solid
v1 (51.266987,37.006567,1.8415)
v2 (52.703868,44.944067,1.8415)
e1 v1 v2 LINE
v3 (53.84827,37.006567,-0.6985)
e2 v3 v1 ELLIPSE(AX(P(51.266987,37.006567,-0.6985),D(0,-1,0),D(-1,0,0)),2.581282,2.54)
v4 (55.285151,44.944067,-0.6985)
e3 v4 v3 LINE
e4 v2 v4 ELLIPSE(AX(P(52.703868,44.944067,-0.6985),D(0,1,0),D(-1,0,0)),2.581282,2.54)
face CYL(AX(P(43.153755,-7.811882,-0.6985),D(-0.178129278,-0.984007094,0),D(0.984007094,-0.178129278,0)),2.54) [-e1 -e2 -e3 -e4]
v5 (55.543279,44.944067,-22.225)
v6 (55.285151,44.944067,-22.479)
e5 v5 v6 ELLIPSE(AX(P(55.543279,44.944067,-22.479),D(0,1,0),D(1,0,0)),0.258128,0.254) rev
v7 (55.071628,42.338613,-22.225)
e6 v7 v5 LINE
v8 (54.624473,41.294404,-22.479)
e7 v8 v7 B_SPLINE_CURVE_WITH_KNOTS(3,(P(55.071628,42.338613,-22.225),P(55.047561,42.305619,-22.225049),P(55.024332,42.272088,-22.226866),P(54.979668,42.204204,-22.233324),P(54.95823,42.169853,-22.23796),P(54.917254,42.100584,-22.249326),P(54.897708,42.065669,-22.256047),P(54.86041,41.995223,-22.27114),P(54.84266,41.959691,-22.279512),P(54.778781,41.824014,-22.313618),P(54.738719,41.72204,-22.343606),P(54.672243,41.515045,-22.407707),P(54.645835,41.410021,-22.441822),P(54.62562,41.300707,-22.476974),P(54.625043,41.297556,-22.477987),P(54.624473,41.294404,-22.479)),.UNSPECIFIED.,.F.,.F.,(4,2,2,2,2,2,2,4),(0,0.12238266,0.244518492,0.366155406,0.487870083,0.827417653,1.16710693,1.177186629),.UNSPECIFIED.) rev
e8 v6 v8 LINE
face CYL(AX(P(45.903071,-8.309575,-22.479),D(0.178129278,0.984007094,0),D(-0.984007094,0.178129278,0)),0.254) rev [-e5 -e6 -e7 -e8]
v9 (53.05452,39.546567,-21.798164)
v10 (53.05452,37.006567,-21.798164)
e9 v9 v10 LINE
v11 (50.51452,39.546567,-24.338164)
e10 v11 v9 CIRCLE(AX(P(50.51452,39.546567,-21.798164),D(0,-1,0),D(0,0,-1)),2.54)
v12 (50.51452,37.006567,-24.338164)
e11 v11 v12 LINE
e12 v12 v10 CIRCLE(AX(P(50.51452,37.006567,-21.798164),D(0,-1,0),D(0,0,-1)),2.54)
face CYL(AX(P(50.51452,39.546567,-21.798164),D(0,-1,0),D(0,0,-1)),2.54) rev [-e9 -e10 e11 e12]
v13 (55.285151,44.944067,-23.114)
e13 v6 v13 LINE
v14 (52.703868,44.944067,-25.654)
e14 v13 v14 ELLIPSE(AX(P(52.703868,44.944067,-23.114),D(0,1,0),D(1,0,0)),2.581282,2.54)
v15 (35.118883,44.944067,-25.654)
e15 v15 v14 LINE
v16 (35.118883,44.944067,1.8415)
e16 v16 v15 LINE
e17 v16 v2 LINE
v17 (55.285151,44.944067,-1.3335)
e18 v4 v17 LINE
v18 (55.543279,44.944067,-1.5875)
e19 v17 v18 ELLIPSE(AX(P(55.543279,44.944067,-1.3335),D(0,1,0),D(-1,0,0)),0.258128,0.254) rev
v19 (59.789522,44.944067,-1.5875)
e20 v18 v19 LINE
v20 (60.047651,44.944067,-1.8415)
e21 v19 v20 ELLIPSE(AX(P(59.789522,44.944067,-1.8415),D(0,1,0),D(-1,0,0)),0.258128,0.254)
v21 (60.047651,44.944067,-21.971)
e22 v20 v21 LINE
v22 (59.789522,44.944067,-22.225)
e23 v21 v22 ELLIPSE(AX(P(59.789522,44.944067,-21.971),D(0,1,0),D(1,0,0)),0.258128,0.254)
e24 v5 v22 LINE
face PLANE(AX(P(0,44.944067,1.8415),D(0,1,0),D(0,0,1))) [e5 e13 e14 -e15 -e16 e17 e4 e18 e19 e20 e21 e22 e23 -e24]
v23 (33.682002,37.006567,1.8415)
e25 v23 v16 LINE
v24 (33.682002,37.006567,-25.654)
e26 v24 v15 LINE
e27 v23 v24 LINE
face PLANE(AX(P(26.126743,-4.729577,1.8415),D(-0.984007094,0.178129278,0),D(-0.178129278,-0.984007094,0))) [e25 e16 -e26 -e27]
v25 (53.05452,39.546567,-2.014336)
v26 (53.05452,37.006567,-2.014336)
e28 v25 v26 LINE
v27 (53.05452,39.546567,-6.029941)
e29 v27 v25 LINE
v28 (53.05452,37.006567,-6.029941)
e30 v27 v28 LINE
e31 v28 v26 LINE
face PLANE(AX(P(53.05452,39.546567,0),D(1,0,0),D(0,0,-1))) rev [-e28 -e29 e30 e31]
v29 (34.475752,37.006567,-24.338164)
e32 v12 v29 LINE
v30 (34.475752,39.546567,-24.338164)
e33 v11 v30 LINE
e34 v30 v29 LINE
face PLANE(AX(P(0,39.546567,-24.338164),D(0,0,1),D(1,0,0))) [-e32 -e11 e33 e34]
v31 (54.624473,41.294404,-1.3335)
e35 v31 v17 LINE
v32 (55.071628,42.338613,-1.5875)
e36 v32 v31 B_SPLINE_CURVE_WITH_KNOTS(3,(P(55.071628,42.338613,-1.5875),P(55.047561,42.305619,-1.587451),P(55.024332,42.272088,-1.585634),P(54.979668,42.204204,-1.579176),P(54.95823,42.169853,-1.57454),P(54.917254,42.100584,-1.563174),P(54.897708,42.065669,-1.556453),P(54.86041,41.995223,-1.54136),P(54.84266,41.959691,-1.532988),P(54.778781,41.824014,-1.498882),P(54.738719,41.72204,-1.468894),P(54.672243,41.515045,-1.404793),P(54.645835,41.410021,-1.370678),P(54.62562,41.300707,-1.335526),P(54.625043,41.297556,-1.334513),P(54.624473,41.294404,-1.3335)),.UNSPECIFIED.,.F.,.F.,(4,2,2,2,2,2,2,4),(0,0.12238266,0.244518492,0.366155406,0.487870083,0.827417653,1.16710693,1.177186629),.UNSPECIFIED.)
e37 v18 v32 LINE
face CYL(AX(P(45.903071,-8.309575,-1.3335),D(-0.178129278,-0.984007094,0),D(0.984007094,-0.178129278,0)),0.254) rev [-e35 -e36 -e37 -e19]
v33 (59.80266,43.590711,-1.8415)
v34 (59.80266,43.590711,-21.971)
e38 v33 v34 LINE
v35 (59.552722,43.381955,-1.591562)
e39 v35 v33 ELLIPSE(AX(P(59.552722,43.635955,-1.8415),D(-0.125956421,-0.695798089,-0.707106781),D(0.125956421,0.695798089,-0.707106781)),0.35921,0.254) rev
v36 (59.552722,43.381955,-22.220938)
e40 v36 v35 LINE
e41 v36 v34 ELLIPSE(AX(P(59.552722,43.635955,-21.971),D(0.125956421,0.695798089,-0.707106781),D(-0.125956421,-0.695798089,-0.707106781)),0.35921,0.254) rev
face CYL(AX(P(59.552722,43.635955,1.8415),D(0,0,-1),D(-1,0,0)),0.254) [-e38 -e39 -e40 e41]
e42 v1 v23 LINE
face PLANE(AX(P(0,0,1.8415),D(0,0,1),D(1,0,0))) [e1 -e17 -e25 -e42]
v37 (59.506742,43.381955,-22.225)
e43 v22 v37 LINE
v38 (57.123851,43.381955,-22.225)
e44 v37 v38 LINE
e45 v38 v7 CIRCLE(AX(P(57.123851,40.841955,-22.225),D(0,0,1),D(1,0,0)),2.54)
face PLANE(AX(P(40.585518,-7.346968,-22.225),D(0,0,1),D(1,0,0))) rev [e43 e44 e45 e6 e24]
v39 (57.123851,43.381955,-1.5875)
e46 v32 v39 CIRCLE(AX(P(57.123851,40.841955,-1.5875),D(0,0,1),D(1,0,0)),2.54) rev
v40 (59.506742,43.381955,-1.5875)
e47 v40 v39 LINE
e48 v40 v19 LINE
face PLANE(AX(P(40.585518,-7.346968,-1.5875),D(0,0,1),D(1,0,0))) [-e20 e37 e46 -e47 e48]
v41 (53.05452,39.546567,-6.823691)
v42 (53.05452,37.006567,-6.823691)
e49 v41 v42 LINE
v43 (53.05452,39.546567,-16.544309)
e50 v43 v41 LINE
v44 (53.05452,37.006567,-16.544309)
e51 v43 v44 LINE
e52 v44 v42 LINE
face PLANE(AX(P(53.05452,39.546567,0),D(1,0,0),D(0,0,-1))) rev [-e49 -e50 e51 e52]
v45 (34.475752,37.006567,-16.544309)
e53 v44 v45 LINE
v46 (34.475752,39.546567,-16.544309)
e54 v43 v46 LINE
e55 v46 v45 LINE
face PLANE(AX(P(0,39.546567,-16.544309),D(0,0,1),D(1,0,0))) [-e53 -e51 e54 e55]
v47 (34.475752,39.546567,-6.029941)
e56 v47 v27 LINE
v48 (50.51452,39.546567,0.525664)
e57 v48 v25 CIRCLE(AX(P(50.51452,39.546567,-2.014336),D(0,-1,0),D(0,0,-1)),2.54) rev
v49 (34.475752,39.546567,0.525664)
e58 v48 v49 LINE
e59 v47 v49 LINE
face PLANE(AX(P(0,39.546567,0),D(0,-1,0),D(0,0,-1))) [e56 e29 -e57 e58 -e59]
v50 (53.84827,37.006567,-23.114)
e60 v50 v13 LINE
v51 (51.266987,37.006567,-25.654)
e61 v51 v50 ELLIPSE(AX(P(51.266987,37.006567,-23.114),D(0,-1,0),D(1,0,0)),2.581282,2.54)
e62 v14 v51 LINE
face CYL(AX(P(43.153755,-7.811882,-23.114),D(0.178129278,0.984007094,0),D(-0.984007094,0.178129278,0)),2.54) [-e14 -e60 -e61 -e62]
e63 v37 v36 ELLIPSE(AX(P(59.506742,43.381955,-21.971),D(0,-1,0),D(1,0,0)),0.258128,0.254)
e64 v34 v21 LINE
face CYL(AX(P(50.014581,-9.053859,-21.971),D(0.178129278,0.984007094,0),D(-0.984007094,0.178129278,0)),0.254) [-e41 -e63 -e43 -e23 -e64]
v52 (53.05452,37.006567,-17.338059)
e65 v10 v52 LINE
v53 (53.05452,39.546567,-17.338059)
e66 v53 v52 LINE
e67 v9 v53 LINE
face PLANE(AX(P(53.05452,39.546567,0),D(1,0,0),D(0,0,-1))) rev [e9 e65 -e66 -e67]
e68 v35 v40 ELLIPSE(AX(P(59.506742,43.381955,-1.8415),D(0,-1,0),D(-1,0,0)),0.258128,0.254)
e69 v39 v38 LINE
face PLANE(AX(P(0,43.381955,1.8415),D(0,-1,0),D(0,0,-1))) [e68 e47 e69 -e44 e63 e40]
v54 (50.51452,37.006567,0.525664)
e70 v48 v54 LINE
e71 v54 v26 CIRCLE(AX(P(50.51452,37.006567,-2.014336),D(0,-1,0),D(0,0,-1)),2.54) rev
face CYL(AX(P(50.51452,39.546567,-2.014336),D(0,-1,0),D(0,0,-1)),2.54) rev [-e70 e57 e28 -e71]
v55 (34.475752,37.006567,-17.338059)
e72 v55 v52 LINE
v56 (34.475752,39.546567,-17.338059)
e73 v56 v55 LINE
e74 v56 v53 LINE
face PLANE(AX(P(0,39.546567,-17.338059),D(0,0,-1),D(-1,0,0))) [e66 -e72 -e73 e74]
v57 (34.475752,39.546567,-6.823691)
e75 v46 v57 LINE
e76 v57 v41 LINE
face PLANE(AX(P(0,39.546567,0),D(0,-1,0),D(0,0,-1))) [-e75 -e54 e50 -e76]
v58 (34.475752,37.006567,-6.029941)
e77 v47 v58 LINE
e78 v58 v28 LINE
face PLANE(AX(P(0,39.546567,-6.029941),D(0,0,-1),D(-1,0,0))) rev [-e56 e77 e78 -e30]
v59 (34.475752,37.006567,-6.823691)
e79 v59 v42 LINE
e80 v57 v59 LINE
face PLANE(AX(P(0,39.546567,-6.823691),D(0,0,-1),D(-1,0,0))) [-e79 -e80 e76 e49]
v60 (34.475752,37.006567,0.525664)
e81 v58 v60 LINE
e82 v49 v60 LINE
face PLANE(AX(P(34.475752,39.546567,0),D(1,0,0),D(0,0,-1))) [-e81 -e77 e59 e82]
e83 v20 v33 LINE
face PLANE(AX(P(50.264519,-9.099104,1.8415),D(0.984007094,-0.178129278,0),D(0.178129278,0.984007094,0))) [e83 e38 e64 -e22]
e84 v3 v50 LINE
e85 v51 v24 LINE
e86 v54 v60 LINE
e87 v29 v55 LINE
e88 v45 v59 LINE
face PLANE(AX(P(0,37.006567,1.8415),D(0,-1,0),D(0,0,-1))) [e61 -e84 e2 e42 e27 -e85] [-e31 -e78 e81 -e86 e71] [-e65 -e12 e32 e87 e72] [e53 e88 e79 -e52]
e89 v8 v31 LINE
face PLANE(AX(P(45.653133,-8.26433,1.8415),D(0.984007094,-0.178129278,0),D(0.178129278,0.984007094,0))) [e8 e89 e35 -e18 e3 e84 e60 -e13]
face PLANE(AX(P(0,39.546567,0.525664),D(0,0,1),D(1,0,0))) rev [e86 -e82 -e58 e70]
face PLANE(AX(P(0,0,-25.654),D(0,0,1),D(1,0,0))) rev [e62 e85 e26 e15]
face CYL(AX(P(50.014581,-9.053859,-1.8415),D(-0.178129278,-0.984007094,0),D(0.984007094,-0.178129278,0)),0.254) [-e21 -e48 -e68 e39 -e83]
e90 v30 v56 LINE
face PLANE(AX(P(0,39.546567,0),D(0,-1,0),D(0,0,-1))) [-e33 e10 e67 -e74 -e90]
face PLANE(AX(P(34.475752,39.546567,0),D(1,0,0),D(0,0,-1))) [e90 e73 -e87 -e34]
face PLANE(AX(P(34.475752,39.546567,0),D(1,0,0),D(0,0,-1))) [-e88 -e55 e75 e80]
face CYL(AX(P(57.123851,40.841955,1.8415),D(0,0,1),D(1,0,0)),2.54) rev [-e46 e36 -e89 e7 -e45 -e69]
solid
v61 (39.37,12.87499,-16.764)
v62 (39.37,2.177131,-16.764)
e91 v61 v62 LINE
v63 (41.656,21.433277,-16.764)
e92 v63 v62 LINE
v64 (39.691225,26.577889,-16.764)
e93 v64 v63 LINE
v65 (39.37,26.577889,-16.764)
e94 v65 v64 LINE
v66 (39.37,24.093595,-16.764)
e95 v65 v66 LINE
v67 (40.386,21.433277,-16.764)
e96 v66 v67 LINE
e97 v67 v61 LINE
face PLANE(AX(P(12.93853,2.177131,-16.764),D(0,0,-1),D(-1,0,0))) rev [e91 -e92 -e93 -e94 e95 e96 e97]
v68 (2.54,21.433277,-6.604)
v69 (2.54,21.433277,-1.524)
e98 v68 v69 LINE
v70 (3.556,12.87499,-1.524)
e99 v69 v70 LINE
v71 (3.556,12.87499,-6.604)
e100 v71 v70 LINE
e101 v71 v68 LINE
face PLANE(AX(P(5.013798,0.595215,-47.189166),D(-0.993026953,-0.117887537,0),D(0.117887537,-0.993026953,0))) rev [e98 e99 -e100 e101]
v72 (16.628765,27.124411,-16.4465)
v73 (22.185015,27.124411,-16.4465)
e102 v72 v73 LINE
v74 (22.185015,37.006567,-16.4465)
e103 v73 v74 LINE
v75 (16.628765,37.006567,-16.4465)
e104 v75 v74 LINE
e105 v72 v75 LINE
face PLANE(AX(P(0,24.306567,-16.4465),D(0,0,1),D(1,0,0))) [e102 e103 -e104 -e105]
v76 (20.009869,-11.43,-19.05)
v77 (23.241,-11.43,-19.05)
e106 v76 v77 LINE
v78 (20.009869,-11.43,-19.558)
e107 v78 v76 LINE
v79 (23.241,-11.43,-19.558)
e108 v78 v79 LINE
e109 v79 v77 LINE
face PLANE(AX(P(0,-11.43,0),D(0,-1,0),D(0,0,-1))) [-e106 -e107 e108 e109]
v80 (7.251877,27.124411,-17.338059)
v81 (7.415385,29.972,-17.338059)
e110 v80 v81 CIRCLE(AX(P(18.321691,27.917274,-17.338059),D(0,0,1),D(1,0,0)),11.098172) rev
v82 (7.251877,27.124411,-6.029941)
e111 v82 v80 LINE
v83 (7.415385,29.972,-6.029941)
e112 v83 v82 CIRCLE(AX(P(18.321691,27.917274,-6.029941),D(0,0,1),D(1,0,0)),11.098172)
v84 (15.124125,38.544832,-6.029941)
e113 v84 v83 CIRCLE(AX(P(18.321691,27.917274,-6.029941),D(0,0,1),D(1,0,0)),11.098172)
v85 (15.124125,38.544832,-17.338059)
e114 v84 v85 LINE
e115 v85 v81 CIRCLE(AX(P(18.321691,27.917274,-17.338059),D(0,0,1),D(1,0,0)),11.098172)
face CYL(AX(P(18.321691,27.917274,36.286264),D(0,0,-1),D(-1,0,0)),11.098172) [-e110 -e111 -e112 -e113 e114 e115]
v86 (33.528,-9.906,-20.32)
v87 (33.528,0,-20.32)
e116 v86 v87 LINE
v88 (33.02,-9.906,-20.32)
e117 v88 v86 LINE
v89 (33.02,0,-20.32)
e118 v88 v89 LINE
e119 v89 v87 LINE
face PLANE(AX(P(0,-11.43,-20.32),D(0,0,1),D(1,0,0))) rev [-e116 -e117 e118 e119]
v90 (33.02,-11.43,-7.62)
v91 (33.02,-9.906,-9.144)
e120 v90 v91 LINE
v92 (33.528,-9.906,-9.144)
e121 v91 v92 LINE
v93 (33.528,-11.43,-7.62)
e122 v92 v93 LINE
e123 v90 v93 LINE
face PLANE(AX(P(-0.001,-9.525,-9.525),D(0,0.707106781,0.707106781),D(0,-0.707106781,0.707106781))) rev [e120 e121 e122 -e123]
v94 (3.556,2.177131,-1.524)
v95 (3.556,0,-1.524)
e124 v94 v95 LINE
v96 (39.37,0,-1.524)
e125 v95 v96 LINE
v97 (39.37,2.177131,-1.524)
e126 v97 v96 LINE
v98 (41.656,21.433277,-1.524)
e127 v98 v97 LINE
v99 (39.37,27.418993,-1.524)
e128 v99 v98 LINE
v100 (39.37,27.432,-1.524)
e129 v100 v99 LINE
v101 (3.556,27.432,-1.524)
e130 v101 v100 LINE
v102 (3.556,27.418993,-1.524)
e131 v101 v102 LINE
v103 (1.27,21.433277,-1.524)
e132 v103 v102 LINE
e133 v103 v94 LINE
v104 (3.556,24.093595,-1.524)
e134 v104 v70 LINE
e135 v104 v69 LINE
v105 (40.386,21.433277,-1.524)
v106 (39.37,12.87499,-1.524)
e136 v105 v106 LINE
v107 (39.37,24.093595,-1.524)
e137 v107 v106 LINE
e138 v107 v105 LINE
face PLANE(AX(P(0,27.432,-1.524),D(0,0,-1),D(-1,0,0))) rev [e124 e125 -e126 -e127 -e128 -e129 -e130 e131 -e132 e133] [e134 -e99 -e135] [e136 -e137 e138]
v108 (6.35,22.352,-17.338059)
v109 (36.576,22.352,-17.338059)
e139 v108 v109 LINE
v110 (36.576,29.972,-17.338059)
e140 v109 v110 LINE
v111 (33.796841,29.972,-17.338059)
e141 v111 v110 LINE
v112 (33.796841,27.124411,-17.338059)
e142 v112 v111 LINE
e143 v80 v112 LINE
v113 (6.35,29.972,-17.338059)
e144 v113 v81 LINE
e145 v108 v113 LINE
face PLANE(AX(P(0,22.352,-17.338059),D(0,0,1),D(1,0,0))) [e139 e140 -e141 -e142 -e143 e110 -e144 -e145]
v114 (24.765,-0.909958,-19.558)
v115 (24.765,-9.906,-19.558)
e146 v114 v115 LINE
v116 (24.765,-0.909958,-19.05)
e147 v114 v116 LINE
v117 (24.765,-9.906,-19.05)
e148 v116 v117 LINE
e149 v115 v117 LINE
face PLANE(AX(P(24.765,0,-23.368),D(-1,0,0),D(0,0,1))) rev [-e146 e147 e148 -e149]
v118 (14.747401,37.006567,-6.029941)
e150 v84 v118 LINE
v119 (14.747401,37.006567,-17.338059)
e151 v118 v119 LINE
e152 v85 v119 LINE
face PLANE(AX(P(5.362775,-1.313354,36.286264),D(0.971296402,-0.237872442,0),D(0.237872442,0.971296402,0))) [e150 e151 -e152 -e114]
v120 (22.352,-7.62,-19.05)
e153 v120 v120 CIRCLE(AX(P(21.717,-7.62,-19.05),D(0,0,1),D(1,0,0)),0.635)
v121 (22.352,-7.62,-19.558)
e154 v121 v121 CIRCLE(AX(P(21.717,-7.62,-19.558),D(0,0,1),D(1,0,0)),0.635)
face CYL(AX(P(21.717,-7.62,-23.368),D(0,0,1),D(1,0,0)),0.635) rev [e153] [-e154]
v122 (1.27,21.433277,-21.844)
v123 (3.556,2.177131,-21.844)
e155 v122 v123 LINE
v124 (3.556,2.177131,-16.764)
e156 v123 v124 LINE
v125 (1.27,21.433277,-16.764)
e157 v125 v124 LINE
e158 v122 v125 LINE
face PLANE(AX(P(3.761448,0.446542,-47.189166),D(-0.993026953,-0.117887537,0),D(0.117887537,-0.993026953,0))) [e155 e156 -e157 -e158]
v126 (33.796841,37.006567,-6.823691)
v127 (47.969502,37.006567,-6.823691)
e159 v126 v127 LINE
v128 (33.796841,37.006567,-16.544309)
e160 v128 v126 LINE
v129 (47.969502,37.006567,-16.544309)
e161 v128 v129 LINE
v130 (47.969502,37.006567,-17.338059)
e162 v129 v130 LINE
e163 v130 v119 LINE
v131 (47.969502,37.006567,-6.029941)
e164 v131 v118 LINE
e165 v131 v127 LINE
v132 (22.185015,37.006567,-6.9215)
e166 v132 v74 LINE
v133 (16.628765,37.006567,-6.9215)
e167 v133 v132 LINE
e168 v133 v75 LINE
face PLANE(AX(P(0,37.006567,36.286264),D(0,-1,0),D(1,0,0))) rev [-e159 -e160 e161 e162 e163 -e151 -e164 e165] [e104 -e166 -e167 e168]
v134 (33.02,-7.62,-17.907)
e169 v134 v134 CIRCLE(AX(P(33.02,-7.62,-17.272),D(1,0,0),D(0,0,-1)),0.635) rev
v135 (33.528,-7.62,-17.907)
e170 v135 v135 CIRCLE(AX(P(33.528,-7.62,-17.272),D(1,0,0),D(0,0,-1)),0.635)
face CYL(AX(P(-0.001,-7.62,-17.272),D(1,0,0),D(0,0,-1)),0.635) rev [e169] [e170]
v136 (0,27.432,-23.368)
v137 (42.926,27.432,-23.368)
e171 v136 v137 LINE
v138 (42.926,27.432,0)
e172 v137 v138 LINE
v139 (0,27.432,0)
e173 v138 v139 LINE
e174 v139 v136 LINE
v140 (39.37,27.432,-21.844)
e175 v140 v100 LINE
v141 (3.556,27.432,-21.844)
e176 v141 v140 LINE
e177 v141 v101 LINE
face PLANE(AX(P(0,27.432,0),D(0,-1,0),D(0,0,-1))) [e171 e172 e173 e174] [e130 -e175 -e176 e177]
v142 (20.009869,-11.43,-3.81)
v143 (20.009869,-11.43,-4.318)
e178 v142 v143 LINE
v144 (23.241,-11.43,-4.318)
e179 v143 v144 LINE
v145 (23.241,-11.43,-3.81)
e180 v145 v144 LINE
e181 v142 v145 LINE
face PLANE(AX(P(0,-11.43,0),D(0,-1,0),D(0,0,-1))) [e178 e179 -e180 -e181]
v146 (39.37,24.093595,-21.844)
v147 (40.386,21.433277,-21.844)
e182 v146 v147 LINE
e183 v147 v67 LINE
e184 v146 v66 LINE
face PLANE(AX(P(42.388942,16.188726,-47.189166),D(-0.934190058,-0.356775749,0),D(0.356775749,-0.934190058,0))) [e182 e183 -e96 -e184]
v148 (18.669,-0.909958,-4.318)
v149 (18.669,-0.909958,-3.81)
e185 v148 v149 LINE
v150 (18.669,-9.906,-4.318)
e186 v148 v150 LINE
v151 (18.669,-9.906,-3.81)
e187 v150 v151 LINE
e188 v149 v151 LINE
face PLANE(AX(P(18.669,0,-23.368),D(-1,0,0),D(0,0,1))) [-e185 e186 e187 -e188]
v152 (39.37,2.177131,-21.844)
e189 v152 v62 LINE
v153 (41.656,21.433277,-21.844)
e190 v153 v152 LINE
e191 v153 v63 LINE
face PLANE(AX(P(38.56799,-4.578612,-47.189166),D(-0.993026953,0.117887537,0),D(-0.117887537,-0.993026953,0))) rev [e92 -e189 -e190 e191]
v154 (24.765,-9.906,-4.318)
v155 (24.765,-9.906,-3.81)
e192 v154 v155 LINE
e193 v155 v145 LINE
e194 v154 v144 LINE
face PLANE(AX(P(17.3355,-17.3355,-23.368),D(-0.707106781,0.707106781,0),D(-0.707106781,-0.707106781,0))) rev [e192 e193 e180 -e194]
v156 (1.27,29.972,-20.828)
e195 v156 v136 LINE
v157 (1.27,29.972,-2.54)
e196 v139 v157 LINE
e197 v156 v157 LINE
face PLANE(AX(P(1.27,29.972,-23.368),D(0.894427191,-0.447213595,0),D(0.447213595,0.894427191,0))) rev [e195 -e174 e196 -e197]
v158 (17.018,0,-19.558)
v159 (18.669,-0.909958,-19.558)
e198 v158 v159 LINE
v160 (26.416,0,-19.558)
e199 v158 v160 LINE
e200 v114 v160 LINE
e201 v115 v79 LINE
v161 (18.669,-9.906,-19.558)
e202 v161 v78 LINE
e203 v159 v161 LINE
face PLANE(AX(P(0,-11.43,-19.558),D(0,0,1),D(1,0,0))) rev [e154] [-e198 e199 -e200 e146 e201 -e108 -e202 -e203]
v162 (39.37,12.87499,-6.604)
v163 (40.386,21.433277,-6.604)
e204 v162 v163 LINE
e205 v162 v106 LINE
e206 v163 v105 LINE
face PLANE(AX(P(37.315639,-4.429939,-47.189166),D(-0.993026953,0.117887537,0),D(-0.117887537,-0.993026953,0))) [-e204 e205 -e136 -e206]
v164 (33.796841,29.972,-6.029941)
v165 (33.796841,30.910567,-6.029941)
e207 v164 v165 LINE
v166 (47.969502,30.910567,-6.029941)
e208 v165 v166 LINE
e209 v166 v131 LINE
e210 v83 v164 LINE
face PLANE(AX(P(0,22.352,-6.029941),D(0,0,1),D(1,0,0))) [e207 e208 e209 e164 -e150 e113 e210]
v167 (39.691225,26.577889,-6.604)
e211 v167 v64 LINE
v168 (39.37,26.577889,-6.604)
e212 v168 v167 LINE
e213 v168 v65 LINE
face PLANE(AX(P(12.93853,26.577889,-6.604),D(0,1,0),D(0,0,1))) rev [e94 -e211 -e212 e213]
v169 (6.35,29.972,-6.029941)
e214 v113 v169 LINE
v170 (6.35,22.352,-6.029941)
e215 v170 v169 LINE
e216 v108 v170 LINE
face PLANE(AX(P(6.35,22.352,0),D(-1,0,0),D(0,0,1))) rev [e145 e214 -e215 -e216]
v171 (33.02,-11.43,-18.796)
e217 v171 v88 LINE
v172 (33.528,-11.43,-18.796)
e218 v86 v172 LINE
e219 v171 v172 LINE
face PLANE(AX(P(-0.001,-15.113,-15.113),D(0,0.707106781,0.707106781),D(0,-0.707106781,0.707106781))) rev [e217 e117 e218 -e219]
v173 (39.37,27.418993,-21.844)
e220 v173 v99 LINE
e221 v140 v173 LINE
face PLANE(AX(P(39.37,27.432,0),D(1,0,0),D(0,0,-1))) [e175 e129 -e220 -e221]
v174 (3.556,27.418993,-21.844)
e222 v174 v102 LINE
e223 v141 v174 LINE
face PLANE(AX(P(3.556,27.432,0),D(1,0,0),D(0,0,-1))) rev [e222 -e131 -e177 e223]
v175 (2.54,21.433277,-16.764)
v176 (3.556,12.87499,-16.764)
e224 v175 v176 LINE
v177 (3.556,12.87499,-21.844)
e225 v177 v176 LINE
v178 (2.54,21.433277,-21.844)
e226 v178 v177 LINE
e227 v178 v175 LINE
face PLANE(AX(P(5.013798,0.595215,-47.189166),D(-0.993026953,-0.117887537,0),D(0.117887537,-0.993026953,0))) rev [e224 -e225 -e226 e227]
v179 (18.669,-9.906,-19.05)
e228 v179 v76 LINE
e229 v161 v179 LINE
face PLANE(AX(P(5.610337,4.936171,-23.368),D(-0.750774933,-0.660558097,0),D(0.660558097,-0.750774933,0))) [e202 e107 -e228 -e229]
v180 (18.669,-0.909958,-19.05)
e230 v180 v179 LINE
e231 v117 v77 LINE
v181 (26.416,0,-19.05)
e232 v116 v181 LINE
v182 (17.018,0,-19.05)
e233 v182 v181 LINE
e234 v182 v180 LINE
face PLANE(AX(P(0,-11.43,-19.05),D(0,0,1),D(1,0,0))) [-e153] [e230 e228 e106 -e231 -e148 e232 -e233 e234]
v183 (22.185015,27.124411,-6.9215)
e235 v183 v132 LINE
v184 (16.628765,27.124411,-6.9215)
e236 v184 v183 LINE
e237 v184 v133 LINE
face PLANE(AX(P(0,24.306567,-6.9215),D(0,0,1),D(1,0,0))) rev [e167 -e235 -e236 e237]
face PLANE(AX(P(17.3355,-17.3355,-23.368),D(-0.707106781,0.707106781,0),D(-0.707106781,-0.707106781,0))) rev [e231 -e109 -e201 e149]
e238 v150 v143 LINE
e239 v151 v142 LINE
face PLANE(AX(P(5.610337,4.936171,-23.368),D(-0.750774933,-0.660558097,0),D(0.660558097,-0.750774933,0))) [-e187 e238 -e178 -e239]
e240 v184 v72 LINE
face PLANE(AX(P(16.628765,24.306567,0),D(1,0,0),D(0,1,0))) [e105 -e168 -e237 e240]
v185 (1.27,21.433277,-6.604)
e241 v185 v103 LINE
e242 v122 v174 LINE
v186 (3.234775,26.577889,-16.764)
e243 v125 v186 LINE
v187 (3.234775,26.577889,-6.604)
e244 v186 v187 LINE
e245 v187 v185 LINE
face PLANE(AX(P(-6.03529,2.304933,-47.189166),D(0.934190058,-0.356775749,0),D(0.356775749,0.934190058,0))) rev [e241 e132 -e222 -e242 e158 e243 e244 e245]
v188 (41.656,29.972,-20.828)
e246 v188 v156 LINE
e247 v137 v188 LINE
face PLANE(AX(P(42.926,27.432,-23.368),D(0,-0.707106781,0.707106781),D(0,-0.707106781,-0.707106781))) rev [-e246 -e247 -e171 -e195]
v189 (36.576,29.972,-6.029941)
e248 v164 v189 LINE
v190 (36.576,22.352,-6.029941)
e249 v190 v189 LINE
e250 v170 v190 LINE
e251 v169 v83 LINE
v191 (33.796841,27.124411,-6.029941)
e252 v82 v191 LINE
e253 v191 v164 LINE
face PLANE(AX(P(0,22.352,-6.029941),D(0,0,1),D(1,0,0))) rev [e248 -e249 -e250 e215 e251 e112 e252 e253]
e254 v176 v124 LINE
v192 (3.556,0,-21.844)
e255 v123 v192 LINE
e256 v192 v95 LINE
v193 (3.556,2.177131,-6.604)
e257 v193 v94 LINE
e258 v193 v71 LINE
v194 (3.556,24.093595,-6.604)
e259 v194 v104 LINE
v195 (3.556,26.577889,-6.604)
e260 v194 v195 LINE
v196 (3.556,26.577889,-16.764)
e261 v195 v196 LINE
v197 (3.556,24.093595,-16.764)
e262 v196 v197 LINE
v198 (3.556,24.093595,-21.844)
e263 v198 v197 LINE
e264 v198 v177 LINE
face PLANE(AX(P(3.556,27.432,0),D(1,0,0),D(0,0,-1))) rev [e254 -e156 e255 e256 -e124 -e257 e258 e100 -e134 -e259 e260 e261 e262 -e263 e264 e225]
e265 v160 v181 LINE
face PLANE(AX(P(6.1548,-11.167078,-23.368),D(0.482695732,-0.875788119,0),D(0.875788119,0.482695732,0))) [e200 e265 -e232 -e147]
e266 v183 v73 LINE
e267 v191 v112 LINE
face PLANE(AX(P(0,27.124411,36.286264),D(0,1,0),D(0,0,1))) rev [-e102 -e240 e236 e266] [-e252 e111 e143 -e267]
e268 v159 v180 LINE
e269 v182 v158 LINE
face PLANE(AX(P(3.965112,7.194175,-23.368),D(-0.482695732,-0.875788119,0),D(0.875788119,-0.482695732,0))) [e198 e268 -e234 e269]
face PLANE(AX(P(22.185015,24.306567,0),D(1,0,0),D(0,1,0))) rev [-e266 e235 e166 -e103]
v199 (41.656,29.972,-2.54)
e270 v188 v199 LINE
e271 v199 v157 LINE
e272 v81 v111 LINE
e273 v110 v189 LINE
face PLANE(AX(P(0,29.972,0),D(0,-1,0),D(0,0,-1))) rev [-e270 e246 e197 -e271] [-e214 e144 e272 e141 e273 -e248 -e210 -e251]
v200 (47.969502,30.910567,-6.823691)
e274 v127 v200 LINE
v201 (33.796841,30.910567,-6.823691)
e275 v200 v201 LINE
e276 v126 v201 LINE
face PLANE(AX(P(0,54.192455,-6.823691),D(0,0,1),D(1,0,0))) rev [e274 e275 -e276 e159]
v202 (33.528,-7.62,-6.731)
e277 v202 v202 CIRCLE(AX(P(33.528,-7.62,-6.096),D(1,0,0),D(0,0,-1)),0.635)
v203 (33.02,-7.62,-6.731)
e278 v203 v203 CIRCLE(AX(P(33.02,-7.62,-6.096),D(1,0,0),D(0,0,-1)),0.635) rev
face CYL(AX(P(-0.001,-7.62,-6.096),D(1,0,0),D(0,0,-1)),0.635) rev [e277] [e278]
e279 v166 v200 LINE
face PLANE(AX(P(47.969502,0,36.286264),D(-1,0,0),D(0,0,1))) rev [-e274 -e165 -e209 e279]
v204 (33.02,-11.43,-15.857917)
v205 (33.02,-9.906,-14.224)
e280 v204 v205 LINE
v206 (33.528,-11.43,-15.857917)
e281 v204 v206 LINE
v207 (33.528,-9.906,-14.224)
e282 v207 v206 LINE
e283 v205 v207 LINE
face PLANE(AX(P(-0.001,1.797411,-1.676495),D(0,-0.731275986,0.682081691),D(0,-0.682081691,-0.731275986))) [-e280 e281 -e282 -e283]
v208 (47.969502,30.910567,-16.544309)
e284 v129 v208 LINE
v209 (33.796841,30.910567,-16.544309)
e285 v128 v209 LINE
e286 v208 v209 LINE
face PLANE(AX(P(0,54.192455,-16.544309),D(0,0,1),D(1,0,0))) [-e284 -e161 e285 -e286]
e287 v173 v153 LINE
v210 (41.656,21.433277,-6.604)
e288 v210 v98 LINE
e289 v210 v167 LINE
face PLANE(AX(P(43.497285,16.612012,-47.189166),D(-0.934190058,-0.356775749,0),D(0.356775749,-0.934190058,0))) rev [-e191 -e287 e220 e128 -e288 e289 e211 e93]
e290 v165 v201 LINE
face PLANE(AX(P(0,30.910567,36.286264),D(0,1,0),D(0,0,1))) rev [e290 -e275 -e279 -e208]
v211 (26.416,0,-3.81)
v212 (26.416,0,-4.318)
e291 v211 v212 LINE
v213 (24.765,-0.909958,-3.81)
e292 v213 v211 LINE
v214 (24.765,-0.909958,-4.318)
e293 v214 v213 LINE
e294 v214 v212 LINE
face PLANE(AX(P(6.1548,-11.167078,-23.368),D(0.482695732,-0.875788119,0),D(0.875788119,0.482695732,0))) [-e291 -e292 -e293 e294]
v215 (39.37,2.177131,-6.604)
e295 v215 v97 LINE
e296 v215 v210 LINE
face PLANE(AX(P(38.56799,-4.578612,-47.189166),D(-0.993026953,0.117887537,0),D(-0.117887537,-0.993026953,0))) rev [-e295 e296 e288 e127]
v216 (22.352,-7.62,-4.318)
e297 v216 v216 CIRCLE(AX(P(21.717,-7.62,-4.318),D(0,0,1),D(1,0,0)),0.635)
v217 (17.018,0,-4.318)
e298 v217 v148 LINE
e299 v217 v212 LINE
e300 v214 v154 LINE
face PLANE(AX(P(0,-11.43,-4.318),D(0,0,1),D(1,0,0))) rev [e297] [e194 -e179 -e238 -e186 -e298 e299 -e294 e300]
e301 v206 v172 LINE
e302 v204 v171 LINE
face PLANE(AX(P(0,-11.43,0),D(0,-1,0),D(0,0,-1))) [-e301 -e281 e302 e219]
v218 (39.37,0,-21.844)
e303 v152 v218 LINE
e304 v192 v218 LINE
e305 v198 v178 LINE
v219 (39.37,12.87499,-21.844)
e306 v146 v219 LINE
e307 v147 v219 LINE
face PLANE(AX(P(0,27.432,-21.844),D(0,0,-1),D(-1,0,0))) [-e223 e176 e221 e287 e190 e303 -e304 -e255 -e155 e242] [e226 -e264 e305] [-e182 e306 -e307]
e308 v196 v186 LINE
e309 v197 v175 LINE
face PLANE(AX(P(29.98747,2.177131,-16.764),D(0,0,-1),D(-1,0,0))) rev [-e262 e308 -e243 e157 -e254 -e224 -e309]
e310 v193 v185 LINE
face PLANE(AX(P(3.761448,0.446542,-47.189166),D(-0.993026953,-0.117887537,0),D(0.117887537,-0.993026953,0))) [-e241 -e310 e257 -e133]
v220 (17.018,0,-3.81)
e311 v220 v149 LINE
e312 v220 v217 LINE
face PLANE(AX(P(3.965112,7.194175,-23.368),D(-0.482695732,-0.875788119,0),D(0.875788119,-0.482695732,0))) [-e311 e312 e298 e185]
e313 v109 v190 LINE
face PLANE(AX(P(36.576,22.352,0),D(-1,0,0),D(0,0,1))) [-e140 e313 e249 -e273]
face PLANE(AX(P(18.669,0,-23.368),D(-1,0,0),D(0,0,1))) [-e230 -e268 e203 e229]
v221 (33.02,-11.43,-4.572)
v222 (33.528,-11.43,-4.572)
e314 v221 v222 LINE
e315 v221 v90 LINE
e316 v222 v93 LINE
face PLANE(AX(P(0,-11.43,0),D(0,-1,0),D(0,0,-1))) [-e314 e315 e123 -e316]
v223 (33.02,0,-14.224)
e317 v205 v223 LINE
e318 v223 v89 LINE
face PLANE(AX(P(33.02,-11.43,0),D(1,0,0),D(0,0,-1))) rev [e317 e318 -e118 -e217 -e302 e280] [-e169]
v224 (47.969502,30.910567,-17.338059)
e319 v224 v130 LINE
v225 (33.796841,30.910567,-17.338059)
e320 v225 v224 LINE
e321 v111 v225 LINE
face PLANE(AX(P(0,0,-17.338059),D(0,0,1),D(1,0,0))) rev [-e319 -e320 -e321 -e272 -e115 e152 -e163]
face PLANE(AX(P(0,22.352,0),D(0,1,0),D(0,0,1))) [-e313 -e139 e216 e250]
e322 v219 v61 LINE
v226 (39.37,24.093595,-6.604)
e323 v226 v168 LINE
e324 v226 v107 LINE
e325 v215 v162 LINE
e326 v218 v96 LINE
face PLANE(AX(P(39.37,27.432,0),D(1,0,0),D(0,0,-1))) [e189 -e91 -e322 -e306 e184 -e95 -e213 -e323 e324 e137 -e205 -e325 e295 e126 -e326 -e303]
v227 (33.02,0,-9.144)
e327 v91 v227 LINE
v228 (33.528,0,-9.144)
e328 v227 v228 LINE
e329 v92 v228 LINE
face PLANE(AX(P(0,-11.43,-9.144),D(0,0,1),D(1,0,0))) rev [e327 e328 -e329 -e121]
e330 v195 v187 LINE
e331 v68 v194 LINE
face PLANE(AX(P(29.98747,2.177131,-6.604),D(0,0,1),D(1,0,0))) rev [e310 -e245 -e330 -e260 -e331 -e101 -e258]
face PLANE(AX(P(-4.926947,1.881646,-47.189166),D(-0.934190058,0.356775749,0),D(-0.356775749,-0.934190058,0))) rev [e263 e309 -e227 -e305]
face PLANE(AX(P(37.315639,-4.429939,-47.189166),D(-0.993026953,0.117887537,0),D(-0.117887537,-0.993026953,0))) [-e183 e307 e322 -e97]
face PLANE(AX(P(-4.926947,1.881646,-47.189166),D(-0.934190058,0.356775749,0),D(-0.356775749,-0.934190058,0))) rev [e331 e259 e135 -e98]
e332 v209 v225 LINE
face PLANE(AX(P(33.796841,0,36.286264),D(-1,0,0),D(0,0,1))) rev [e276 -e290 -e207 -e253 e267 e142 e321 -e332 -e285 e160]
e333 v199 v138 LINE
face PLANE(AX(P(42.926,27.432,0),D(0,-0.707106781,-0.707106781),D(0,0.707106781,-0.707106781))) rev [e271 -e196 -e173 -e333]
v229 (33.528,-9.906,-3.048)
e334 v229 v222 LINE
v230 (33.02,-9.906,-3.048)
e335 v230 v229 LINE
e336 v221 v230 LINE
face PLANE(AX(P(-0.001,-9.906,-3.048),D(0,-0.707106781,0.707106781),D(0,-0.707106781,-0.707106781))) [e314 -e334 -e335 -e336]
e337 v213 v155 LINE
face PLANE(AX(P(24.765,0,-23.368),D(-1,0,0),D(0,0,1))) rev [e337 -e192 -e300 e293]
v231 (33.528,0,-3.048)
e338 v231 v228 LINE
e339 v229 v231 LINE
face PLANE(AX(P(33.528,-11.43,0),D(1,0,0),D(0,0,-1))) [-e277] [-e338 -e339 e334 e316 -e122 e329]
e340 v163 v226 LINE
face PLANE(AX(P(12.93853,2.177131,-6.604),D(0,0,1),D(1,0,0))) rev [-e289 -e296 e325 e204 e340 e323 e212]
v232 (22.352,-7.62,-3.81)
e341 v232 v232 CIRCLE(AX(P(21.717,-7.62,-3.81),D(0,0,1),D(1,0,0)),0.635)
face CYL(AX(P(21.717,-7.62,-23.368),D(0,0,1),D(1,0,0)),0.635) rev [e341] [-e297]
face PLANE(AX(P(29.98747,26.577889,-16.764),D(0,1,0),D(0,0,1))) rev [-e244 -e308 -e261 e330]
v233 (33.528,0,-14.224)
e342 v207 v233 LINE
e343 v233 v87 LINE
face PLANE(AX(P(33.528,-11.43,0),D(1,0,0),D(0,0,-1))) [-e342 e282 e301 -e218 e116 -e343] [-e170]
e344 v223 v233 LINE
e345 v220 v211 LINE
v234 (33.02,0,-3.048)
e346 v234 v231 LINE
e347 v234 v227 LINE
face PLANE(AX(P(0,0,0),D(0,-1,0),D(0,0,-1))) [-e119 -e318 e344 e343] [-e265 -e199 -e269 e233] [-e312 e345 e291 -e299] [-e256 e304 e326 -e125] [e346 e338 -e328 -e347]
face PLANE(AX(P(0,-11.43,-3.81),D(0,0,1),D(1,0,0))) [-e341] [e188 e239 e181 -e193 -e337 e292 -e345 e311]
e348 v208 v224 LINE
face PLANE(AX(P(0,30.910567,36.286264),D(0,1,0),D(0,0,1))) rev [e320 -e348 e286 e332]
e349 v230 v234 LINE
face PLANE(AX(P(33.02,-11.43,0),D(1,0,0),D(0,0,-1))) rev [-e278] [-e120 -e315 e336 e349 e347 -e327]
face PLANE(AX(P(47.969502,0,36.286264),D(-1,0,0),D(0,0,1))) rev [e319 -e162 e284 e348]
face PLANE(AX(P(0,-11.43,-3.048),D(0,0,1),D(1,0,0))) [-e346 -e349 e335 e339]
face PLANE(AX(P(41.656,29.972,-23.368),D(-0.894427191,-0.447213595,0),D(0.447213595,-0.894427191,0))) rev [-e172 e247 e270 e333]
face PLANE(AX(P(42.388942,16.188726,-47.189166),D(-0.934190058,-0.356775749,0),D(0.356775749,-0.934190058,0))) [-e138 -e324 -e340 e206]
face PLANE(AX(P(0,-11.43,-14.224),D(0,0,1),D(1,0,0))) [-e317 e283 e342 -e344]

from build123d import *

# Parameters (mm, degrees)
SKETCH1_W                = 42.926
SKETCH1_H                = 23.368
BOSS_EXTRUDE1_DEPTH      = 29.972
SKETCH2_W                = 42.926
SKETCH2_H                = 23.368
SKETCH2_W_2              = 35.814
SKETCH2_H_2              = 20.32
CUT_EXTRUDE1_DEPTH       = 27.432
CUT_EXTRUDE3_DEPTH       = 58.332588325
CUT_EXTRUDE4_DEPTH       = 58.332588325
SKETCH6_W                = 30.226
SKETCH6_H                = 11.308118352
CUT_EXTRUDE5_DEPTH       = 7.62
BOSS_EXTRUDE2_DEPTH      = 20.32
SKETCH9_W                = 9.398
SKETCH9_H                = 0.508
SKETCH9_W_2              = 0.508
SKETCH9_H_2              = 6.096
BOSS_EXTRUDE3_DEPTH      = 11.43
CUT_EXTRUDE6_REACH       = 52.68
SKETCH10_R               = 0.635
SKETCH11_R               = 0.635
CUT_EXTRUDE7_DEPTH       = 56.888081234
BOSS_EXTRUDE7_DEPTH      = 11.308118351
CUT_EXTRUDE8_REACH       = 74.758
SKETCH13_W               = 10.16
SKETCH13_H               = 24.400758564
SKETCH14_W               = 10.16
SKETCH14_H               = 24.400758564
CUT_EXTRUDE9_DEPTH       = 12.7
BOSS_EXTRUDE8_DEPTH      = 1.8415
BOSS_EXTRUDE8_DEPTH_BACK = 25.654
SKETCH17_W               = 3.429
SKETCH17_H               = 2.254926229
SKETCH17_H_2             = 1.5875
CUT_EXTRUDE11_DEPTH      = 4.686333783
FILLET2_R                = 2.54
FILLET3_R                = 2.54
FILLET6_R                = 0.254
CUT_EXTRUDE12_START      = -6.096
CUT_EXTRUDE12_OUTLINE_W  = 14.172661673
CUT_EXTRUDE12_OUTLINE_H  = 9.720618352
CUT_EXTRUDE12_DEPTH      = 6.096
CUT_EXTRUDE13_DEPTH      = 2.54
SKETCH20_W               = 5.55625
SKETCH20_H               = 9.525
CUT_EXTRUDE14_DEPTH      = 12.7


# Read off the part's stored shape, not the designer's step: Cut-Extrude12
with BuildPart() as part:
    # Sketch1 → Boss-Extrude1 (new body)
    with BuildSketch(Plane(origin=(0, 0, 0), x_dir=(1, 0, 0), z_dir=(0, 1, 0))):
        with Locations((21.463, 11.684)):
            Rectangle(SKETCH1_W, SKETCH1_H)
    extrude(amount=BOSS_EXTRUDE1_DEPTH)

    # Sketch2 → Cut-Extrude1 (cut)
    with BuildSketch(Plane.XZ):
        with Locations((21.463, -11.684)):
            Rectangle(SKETCH2_W, SKETCH2_H)
        with Locations((21.463, -11.684)):
            Rectangle(SKETCH2_W_2, SKETCH2_H_2, mode=Mode.SUBTRACT)
    extrude(amount=-CUT_EXTRUDE1_DEPTH, mode=Mode.SUBTRACT)

    # Sketch5 → Cut-Extrude3 (cut, through all)
    with BuildSketch(Plane.XY):
        Polygon((0, 29.972), (0, 27.432), (1.27, 29.972), align=None)
        Polygon((42.926, 29.972), (42.926, 27.432), (41.656, 29.972), align=None)
    extrude(amount=-CUT_EXTRUDE3_DEPTH, mode=Mode.SUBTRACT)

    # Sketch3 → Cut-Extrude4 (cut, through all)
    with BuildSketch(Plane.ZY):
        Polygon((-23.368, 27.432), (-20.828, 29.972), (-23.368, 29.972), align=None)
        Polygon((0, 27.432), (0, 29.972), (-2.54, 29.972), align=None)
    extrude(amount=-CUT_EXTRUDE4_DEPTH, mode=Mode.SUBTRACT)

    # Sketch6 → Cut-Extrude5 (cut)
    with BuildSketch(Plane(origin=(0, 29.972, 0), x_dir=(1, 0, 0), z_dir=(0, 1, 0))):
        with Locations((21.463, 11.684)):
            Rectangle(SKETCH6_W, SKETCH6_H)
    extrude(amount=-CUT_EXTRUDE5_DEPTH, mode=Mode.SUBTRACT)

    # Sketch7 → Boss-Extrude2 (add)
    with BuildSketch(Plane.XY.offset(-1.524)):
        Polygon((3.556, 12.874989672), (2.54, 21.433276772), (1.27, 21.433276772), (3.556, 2.177130797), align=None)
        Polygon((2.54, 21.433276772), (3.556, 24.093595202), (3.556, 27.418993238), (1.27, 21.433276772), align=None)
        Polygon((39.37, 2.177130797), (41.656, 21.433276772), (40.386, 21.433276772), (39.37, 12.874989672), align=None)
        Polygon((41.656, 21.433276772), (39.37, 27.418993238), (39.37, 24.093595202), (40.386, 21.433276772), align=None)
    extrude(amount=-BOSS_EXTRUDE2_DEPTH)

    # Sketch9 → Boss-Extrude3 (add)
    with BuildSketch(Plane.XZ):
        with Locations((21.717, -19.304)):
            Rectangle(SKETCH9_W, SKETCH9_H)
        with Locations((21.717, -4.064)):
            Rectangle(SKETCH9_W, SKETCH9_H)
        with Locations((33.274, -6.096)):
            Rectangle(SKETCH9_W_2, SKETCH9_H_2)
        with Locations((33.274, -17.272)):
            Rectangle(SKETCH9_W_2, SKETCH9_H_2)
    extrude(amount=BOSS_EXTRUDE3_DEPTH)

    # Sketch10 → Cut-Extrude6 (cut, up to next)
    with BuildSketch(Plane(origin=(33.528, 0, 0), x_dir=(0, 0, -1), z_dir=(1, 0, 0)), mode=Mode.PRIVATE) as cut_extrude6_sk1:
        Polygon((18.796, -11.43), (20.32, -11.43), (20.32, -9.906), align=None)
    cut_extrude6_tool1 = extrude(cut_extrude6_sk1.sketch, amount=-CUT_EXTRUDE6_REACH, mode=Mode.PRIVATE) & part.part
    # Sketch10 → Cut-Extrude6 (cut, up to next)
    with BuildSketch(Plane(origin=(33.528, 0, 0), x_dir=(0, 0, -1), z_dir=(1, 0, 0)), mode=Mode.PRIVATE) as cut_extrude6_sk2:
        Polygon((14.224, -9.906), (14.224, -11.43), (15.857916608, -11.43), align=None)
    cut_extrude6_tool2 = extrude(cut_extrude6_sk2.sketch, amount=-CUT_EXTRUDE6_REACH, mode=Mode.PRIVATE) & part.part
    # Sketch10 → Cut-Extrude6 (cut, up to next)
    with BuildSketch(Plane(origin=(33.528, 0, 0), x_dir=(0, 0, -1), z_dir=(1, 0, 0)), mode=Mode.PRIVATE) as cut_extrude6_sk3:
        Polygon((3.048, -9.906), (3.048, -11.43), (4.572, -11.43), align=None)
    cut_extrude6_tool3 = extrude(cut_extrude6_sk3.sketch, amount=-CUT_EXTRUDE6_REACH, mode=Mode.PRIVATE) & part.part
    # Sketch10 → Cut-Extrude6 (cut, up to next)
    with BuildSketch(Plane(origin=(33.528, 0, 0), x_dir=(0, 0, -1), z_dir=(1, 0, 0)), mode=Mode.PRIVATE) as cut_extrude6_sk4:
        Polygon((7.62, -11.43), (9.144, -11.43), (9.144, -9.906), align=None)
    cut_extrude6_tool4 = extrude(cut_extrude6_sk4.sketch, amount=-CUT_EXTRUDE6_REACH, mode=Mode.PRIVATE) & part.part
    # Sketch10 → Cut-Extrude6 (cut, up to next)
    with BuildSketch(Plane(origin=(33.528, 0, 0), x_dir=(0, 0, -1), z_dir=(1, 0, 0)), mode=Mode.PRIVATE) as cut_extrude6_sk5:
        with Locations((6.096, -7.62)):
            Circle(SKETCH10_R)
    cut_extrude6_tool5 = extrude(cut_extrude6_sk5.sketch, amount=-CUT_EXTRUDE6_REACH, mode=Mode.PRIVATE) & part.part
    # Sketch10 → Cut-Extrude6 (cut, up to next)
    with BuildSketch(Plane(origin=(33.528, 0, 0), x_dir=(0, 0, -1), z_dir=(1, 0, 0)), mode=Mode.PRIVATE) as cut_extrude6_sk6:
        with Locations((17.272, -7.62)):
            Circle(SKETCH10_R)
    cut_extrude6_tool6 = extrude(cut_extrude6_sk6.sketch, amount=-CUT_EXTRUDE6_REACH, mode=Mode.PRIVATE) & part.part
    add(cut_extrude6_tool1.solids().sort_by_distance((33.528, -10.922, -19.812))[0], mode=Mode.SUBTRACT)
    add(cut_extrude6_tool2.solids().sort_by_distance((33.528, -10.922, -14.768639))[0], mode=Mode.SUBTRACT)
    add(cut_extrude6_tool3.solids().sort_by_distance((33.528, -10.922, -3.556))[0], mode=Mode.SUBTRACT)
    add(cut_extrude6_tool4.solids().sort_by_distance((33.528, -10.922, -8.636))[0], mode=Mode.SUBTRACT)
    add(cut_extrude6_tool5.solids().sort_by_distance((33.528, -7.62, -6.096))[0], mode=Mode.SUBTRACT)
    add(cut_extrude6_tool6.solids().sort_by_distance((33.528, -7.62, -17.272))[0], mode=Mode.SUBTRACT)

    # Sketch11 → Cut-Extrude7 (cut, through all)
    with BuildSketch(Plane.XY.offset(-3.81)):
        Polygon((18.669, -0.909958284), (17.018, 0), (17.018, -11.43), (20.009868608, -11.43), (18.669, -9.906), align=None)
        with Locations((21.717, -7.62)):
            Circle(SKETCH11_R)
        Polygon((26.416, 0), (24.765, -0.909958284), (24.765, -9.906), (23.241, -11.43), (26.416, -11.43), align=None)
    extrude(amount=-CUT_EXTRUDE7_DEPTH, mode=Mode.SUBTRACT)

    # Sketch12 → Boss-Extrude7 (add)
    with BuildSketch(Plane.XY.offset(-17.338059176)):
        with BuildLine():
            Line((33.796840653, 30.910566615), (47.969502326, 30.910566615))
            Line((47.969502326, 30.910566615), (47.969502326, 37.006566615))
            Line((47.969502326, 37.006566615), (14.747400659, 37.006566615))
            Line((14.747400659, 37.006566615), (15.124125013, 38.544832274))
            ThreePointArc((15.124125013, 38.544832274), (10.069226718, 35.337937954), (7.415384629, 29.972))
            Line((7.415384629, 29.972), (33.796840653, 29.972))
            Line((33.796840653, 29.972), (33.796840653, 30.910566615))
        make_face()
        with BuildLine():
            Line((33.796840653, 27.124411179), (33.796840653, 29.972))
            Line((33.796840653, 29.972), (7.415384629, 29.972))
            ThreePointArc((7.415384629, 29.972), (7.241769578, 28.553480232), (7.251876855, 27.124411179))
            Line((7.251876855, 27.124411179), (33.796840653, 27.124411179))
        make_face()
    extrude(amount=BOSS_EXTRUDE7_DEPTH)

    # Cut-Extrude8: up to this face of the body (flat: up to its plane)
    cut_extrude8_end = Plane(part.part.faces().sort_by_distance((3.556, 1.088565398, -11.684))[0])
    # Sketch13 → Cut-Extrude8 (cut, up to the picked face)
    with BuildSketch(Plane.ZY.offset(9.144), mode=Mode.PRIVATE) as cut_extrude8_sk1:
        with Locations((-11.684, 14.377510079)):
            Rectangle(SKETCH13_W, SKETCH13_H)
    cut_extrude8_tool1 = split(extrude(cut_extrude8_sk1.sketch, amount=-CUT_EXTRUDE8_REACH, mode=Mode.PRIVATE), bisect_by=cut_extrude8_end, keep=Keep.BOTH, mode=Mode.PRIVATE)
    add(cut_extrude8_tool1.solids().sort_by(Axis((-9.144, 14.37751, -11.684), (1, 0, 0)))[0], mode=Mode.SUBTRACT)

    # Sketch14 → Cut-Extrude9 (cut)
    with BuildSketch(Plane(origin=(52.07, 0, 0), x_dir=(0, 0, -1), z_dir=(1, 0, 0))):
        with Locations((11.684, 14.377510079)):
            Rectangle(SKETCH14_W, SKETCH14_H)
    extrude(amount=-CUT_EXTRUDE9_DEPTH, mode=Mode.SUBTRACT)

    # Cut-Extrude12 outline → Cut-Extrude12 (cut)
    with BuildSketch(Plane.XZ.offset(-30.910566615).offset(CUT_EXTRUDE12_START)):
        with Locations((40.88317149, -11.684)):
            Rectangle(CUT_EXTRUDE12_OUTLINE_W, CUT_EXTRUDE12_OUTLINE_H)
    extrude(amount=CUT_EXTRUDE12_DEPTH, mode=Mode.SUBTRACT)

    # Sketch20 → Cut-Extrude14 (cut)
    with BuildSketch(Plane(origin=(0, 37.006566615, 0), x_dir=(1, 0, 0), z_dir=(0, 1, 0))):
        with Locations((19.406889706, 11.684)):
            Rectangle(SKETCH20_W, SKETCH20_H)
    extrude(amount=-CUT_EXTRUDE14_DEPTH, mode=Mode.SUBTRACT)


with BuildPart() as body_2:
    # Sketch15 → Boss-Extrude8 (new, two sides: drawn at the far end of the back side and taken through both)
    with BuildSketch(Plane.XY.offset(-BOSS_EXTRUDE8_DEPTH_BACK)):
        Polygon((33.682002326, 37.006566615), (47.969502326, 37.006566615), (53.848269551, 37.006566615), (55.002370372, 43.381955354), (55.285150601, 44.944066615), (35.118883377, 44.944066615), align=None)
        Polygon((55.285150601, 44.944066615), (55.002370372, 43.381955354), (59.764870372, 43.381955354), (60.047650601, 44.944066615), align=None)
    extrude(amount=BOSS_EXTRUDE8_DEPTH + BOSS_EXTRUDE8_DEPTH_BACK)

    # Sketch17 → Cut-Extrude11 (cut)
    with BuildSketch(Plane(origin=(50.264518988, -9.099103601, 0), x_dir=(0, 0, -1), z_dir=(0.9840070935891015, -0.17812927824007313, 0))):
        with Locations((-0.127, 52.206561912)):
            Rectangle(SKETCH17_W, SKETCH17_H)
        with Locations((-0.127, 54.127775026)):
            Rectangle(SKETCH17_W, SKETCH17_H_2)
        with Locations((23.9395, 52.206561912)):
            Rectangle(SKETCH17_W, SKETCH17_H)
        with Locations((23.9395, 54.127775026)):
            Rectangle(SKETCH17_W, SKETCH17_H_2)
    extrude(amount=-CUT_EXTRUDE11_DEPTH, mode=Mode.SUBTRACT)

    # Fillet2
    fillet2_edges = [body_2.edges().sort_by_distance(p)[0] for p in [
        (54.425319961, 40.194260985, 1.8415),
        (54.425319961, 40.194260985, -25.654),
    ]]
    fillet(fillet2_edges, radius=FILLET2_R)

    # Fillet3
    fillet3_edges = [body_2.edges().sort_by_distance(p)[0] for p in [
        (55.002370372, 43.381955354, -11.90625),
    ]]
    fillet(fillet3_edges, radius=FILLET3_R)

    # Fillet6
    fillet6_edges = [body_2.edges().sort_by_distance(p)[0] for p in [
        (59.764870372, 43.381955354, -11.90625),
        (59.906260486, 44.163010985, -1.5875),
        (54.813421497, 42.338179537, -1.5875),
        (59.906260486, 44.163010985, -22.225),
        (54.813421497, 42.338179537, -22.225),
    ]]
    fillet(fillet6_edges, radius=FILLET6_R)

    # Sketch19 → Cut-Extrude13 (cut)
    with BuildSketch(Plane.XZ.offset(-37.006566615)):
        with BuildLine():
            Line((34.475752326, 0.525663982), (34.475752326, -6.029940824))
            Line((34.475752326, -6.029940824), (47.969502326, -6.029940824))
            Line((47.969502326, -6.029940824), (53.054519551, -6.029940824))
            Line((53.054519551, -6.029940824), (53.054519551, -2.014336018))
            ThreePointArc((53.054519551, -2.014336018), (52.310570775, -0.218284794), (50.514519551, 0.525663982))
            Line((50.514519551, 0.525663982), (34.475752326, 0.525663982))
        make_face()
        Polygon((47.969502326, -6.823690824), (34.475752326, -6.823690824), (34.475752326, -16.544309176), (47.969502326, -16.544309176), (53.054519551, -16.544309176), (53.054519551, -6.823690824), align=None)
        with BuildLine():
            Line((47.969502326, -17.338059176), (34.475752326, -17.338059176))
            Line((34.475752326, -17.338059176), (34.475752326, -24.338163982))
            Line((34.475752326, -24.338163982), (50.514519551, -24.338163982))
            ThreePointArc((50.514519551, -24.338163982), (52.310570775, -23.594215206), (53.054519551, -21.798163982))
            Line((53.054519551, -21.798163982), (53.054519551, -17.338059176))
            Line((53.054519551, -17.338059176), (47.969502326, -17.338059176))
        make_face()
    extrude(amount=-CUT_EXTRUDE13_DEPTH, mode=Mode.SUBTRACT)


solid = Compound([part.part, body_2.part])
